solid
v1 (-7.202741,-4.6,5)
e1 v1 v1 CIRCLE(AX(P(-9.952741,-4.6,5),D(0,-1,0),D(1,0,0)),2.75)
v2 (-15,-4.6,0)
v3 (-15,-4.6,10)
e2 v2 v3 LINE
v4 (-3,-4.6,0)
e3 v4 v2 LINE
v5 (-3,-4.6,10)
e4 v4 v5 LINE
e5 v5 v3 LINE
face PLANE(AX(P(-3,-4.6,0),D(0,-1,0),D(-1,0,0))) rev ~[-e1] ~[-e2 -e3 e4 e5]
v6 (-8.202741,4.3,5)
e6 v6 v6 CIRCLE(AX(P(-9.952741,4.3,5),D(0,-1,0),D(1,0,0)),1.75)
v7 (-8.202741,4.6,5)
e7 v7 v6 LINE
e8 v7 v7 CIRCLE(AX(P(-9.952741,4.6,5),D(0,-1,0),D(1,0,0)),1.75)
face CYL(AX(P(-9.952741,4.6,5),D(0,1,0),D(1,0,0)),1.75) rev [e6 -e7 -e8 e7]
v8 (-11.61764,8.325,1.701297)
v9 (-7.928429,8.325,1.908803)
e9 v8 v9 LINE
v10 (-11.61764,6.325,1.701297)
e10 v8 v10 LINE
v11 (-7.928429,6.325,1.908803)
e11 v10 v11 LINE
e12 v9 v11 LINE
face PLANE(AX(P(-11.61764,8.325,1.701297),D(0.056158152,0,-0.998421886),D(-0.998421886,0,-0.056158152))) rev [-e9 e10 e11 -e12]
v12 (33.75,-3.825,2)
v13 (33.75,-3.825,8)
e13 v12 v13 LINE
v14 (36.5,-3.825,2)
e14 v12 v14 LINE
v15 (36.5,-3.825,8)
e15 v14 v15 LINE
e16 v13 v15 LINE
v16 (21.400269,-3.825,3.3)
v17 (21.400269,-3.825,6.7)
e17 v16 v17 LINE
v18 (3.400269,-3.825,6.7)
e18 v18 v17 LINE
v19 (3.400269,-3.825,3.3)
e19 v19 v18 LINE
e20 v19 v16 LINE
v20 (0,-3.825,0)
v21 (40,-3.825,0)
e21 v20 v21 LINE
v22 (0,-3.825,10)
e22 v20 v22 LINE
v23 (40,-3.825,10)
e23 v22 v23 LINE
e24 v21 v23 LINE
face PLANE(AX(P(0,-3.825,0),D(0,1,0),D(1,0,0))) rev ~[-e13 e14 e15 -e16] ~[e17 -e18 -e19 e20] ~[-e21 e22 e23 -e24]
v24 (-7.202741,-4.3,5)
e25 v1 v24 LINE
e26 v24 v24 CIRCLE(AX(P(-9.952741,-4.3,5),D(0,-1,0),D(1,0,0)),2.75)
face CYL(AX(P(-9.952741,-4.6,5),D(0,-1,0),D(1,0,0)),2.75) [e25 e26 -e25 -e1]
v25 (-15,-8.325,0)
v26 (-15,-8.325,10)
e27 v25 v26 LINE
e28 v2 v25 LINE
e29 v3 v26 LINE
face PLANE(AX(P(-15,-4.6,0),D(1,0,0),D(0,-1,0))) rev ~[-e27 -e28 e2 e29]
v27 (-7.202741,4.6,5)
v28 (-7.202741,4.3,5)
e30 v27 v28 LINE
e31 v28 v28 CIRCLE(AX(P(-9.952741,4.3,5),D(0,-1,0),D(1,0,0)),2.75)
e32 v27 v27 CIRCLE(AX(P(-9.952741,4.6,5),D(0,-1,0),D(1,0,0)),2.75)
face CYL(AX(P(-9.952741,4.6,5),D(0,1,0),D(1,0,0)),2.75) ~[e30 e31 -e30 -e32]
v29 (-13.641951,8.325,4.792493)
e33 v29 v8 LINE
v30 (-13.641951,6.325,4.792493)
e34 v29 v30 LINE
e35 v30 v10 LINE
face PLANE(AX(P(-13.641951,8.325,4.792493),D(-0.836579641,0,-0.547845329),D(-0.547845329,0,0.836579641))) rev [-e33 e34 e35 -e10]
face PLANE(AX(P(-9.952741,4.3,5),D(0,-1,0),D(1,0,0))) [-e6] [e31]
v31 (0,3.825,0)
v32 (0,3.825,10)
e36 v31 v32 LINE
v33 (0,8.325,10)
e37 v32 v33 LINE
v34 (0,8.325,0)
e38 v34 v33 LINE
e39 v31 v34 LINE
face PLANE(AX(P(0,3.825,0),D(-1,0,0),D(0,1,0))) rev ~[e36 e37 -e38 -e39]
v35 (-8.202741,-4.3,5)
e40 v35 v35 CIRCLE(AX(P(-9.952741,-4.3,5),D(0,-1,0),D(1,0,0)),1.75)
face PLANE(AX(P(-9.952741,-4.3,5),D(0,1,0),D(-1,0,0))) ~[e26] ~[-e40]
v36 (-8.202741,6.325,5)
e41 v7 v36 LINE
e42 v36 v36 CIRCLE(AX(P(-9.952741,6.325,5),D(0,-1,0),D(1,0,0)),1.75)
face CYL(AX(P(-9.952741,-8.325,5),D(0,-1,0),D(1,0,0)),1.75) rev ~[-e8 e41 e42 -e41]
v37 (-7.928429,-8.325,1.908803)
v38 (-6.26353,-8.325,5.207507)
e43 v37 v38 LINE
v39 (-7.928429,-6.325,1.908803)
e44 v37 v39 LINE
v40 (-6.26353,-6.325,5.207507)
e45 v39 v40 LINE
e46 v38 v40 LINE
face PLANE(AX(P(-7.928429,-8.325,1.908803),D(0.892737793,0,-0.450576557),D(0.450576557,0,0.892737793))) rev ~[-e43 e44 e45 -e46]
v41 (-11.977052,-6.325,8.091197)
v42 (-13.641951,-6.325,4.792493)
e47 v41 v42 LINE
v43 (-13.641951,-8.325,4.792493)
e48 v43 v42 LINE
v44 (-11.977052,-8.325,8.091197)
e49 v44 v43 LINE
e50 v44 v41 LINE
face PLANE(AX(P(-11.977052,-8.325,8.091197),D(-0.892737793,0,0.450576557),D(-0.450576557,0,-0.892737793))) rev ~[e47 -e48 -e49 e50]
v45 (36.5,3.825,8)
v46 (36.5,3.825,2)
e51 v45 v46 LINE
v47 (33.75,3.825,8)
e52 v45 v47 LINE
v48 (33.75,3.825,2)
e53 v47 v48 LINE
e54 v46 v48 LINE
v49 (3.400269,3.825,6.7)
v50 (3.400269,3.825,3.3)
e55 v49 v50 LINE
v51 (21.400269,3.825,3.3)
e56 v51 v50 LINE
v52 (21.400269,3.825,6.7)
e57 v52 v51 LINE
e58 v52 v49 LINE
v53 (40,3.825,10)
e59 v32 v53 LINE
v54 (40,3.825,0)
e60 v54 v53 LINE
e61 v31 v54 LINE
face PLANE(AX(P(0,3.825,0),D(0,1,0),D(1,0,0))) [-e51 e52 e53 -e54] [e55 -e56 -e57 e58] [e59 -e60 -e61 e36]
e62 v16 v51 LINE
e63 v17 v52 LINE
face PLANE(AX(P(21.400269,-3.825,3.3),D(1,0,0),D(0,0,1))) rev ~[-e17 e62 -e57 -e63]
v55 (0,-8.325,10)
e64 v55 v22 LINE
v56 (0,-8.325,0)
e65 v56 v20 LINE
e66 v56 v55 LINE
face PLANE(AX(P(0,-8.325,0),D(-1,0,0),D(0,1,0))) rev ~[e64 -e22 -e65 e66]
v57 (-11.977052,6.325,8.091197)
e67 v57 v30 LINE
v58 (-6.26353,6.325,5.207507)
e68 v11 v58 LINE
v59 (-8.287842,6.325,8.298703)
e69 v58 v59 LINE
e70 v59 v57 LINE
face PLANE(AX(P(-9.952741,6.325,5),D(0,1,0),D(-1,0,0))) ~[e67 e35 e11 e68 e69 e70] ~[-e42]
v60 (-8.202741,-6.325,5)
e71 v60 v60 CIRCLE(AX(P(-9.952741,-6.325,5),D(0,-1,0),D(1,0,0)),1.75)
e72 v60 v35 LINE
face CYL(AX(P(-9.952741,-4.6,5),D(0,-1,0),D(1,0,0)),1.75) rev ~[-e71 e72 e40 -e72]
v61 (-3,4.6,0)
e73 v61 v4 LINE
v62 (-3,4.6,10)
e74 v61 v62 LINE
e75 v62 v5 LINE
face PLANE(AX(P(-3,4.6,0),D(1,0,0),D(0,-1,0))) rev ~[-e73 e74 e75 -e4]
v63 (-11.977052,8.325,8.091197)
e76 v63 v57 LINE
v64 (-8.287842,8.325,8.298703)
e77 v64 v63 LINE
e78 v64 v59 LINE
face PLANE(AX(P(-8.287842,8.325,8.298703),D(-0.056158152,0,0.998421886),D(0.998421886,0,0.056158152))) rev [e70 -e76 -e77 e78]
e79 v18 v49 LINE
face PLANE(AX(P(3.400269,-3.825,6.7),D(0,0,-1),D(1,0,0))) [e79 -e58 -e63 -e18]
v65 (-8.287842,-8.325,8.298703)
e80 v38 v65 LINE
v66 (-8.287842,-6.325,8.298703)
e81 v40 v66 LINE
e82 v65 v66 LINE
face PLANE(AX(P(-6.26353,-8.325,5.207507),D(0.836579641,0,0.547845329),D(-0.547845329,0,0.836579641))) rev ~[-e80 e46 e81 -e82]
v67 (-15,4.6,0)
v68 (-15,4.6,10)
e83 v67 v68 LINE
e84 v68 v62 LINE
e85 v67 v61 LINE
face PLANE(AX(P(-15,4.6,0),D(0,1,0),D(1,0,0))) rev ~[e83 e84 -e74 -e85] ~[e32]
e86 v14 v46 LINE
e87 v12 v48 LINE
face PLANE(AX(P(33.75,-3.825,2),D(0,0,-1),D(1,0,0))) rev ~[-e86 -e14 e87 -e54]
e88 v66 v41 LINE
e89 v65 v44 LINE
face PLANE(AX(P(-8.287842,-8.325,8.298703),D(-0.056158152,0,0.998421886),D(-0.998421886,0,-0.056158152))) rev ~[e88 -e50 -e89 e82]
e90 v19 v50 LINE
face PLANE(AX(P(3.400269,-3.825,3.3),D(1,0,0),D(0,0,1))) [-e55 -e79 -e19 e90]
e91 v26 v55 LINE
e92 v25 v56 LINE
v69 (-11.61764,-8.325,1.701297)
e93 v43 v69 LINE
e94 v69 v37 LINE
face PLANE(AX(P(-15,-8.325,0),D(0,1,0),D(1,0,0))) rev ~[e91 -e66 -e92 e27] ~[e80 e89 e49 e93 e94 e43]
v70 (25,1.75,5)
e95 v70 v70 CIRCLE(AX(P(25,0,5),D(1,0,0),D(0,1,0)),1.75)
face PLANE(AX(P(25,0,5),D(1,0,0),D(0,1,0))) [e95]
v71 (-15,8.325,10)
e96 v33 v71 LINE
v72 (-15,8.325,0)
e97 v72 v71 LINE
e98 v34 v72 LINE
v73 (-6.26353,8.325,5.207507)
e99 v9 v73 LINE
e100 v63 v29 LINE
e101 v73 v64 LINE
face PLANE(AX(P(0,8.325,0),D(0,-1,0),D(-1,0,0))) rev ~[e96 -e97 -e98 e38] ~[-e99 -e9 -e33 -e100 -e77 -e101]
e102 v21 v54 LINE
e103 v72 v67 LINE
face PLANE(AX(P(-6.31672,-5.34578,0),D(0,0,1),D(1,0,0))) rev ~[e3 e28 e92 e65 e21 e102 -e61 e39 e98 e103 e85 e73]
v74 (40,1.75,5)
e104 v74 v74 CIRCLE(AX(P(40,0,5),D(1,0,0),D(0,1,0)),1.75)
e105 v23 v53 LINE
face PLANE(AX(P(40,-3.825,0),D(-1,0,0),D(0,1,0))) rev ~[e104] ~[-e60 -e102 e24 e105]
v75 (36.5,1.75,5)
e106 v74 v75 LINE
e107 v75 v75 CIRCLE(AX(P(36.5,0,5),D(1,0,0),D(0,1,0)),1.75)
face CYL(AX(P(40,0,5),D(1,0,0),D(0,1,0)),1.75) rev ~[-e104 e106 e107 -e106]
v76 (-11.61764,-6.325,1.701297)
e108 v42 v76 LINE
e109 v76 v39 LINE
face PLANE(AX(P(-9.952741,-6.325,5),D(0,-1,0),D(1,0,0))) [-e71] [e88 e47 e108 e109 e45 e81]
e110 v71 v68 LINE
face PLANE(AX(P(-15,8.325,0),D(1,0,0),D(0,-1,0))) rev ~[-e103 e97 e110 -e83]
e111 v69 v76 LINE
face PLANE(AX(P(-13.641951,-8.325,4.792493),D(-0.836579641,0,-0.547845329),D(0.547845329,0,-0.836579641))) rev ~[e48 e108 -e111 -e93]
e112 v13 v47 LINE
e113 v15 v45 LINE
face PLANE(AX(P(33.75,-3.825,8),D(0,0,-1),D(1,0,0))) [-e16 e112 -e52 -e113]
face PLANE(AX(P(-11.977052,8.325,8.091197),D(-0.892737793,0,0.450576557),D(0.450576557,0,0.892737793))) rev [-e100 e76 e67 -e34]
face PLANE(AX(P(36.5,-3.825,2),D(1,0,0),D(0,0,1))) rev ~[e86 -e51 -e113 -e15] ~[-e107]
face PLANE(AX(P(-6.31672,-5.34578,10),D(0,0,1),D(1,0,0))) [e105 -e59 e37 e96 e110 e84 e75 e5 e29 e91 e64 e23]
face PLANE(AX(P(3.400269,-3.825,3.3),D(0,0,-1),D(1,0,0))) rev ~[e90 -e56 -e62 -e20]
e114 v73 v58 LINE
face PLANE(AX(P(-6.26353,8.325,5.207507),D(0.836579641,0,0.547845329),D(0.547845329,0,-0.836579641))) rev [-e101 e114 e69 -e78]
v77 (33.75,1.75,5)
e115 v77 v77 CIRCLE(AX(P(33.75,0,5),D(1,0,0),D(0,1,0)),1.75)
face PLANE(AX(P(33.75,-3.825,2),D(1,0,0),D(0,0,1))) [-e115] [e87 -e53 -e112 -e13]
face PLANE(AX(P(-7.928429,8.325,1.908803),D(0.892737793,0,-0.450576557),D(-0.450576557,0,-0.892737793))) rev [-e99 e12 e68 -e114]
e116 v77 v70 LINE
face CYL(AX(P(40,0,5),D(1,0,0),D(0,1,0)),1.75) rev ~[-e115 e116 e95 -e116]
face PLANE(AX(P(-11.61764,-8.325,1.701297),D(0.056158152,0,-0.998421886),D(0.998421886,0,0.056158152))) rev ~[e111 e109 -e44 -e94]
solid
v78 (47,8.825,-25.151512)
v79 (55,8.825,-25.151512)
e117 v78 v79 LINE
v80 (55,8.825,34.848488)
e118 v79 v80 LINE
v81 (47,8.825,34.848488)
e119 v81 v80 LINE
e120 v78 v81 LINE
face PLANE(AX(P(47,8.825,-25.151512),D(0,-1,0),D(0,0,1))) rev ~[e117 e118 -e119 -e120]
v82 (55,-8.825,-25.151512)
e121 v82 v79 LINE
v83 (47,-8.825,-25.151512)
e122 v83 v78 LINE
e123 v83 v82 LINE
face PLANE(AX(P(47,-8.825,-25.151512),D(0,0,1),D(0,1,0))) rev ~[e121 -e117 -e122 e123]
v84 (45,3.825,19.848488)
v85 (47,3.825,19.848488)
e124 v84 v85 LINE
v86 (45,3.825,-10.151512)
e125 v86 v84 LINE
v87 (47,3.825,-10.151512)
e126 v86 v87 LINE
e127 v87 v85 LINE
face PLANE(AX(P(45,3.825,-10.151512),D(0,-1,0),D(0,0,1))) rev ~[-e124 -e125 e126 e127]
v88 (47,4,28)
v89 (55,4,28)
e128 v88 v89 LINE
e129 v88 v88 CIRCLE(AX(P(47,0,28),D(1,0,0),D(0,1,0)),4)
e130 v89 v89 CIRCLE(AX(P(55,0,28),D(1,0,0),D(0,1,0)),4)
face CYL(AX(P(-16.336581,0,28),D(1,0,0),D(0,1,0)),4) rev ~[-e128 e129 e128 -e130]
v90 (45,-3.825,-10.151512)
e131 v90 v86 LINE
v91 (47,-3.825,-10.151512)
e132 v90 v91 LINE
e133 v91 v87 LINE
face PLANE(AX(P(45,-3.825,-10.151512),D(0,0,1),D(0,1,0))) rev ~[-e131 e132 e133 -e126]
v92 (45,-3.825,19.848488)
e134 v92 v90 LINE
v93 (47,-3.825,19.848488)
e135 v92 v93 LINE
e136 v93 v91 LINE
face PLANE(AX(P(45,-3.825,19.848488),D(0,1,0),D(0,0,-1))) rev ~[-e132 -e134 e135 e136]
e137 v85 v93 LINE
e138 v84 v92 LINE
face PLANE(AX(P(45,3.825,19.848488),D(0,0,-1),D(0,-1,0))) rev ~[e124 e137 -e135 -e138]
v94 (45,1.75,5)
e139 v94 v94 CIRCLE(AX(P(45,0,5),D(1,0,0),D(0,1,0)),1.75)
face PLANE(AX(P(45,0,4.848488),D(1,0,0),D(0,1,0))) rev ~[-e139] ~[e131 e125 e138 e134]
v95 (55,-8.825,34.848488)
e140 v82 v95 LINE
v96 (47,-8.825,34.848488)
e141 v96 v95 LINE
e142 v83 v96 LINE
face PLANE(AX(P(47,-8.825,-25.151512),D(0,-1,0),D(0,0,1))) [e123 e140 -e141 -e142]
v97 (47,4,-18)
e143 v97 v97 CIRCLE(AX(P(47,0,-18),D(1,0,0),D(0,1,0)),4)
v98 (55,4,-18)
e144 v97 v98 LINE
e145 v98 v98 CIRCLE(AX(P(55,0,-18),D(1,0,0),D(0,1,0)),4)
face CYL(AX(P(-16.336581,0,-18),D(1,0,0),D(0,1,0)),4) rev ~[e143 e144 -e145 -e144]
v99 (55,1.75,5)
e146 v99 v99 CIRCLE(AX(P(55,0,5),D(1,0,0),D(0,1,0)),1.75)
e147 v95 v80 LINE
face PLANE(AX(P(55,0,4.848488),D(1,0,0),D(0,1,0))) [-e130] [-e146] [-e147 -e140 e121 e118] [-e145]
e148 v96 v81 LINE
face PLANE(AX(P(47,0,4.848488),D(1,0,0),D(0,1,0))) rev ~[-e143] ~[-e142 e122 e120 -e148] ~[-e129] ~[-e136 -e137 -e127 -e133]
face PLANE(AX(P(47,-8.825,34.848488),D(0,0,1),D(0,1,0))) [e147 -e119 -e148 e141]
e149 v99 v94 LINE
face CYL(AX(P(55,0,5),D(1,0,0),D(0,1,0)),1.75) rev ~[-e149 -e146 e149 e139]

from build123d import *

# Parameters (mm, degrees)
F0_W      = 40
F0_H      = 3.825
F1_DEPTH  = 10
F2_R      = 1.75
F3_DEPTH  = 16.651
F4_W      = 18
F4_H      = 3.4
F4_W_2    = 2.75
F4_H_2    = 6
F5_DEPTH  = 12.151
F6_R      = 1.75
F7_DEPTH  = 15
F10_DEPTH = 2
F11_W     = 17.65
F11_H     = 60
F12_DEPTH = 8
F13_R     = 1.75
F14_DEPTH = 70.001
F15_R     = 2.75
F15_R_2   = 1.75
F16_DEPTH = 0.3
F17_R     = 1.75
F18_DEPTH = 2
F20_D     = 8


# Not quite as in the source:
# - a pattern or mirror of a feature is missing from the dataset's text; its kind, count and spacing are read off the source's solid


with BuildPart() as f1:
    # F0 (on Top) → F1 (new body)
    with BuildSketch(Plane.XY):
        Polygon((0, -3.825), (0, 0), (-3, 0), (-3, -4.6), (-15, -4.6), (-15, -8.325), (0, -8.325), align=None)
        Polygon((-3, 0), (0, 0), (0, 3.825), (0, 8.325), (-15, 8.325), (-15, 4.6), (-3, 4.6), align=None)
        with Locations((20, 1.9125)):
            Rectangle(F0_W, F0_H)
        with Locations((20, -1.9125)):
            Rectangle(F0_W, F0_H)
    extrude(amount=F1_DEPTH)

    # F2 (on face) → F3 (cut, through all)
    with BuildSketch(Plane.XZ.offset(8.325)):
        with Locations((-9.9527407438, 5)):
            Circle(F2_R)
    extrude(amount=-F3_DEPTH, mode=Mode.SUBTRACT)

    # F4 (on face) → F5 (cut, through all)
    with BuildSketch(Plane.XZ.offset(3.825)):
        with Locations((12.4002694301, 5)):
            Rectangle(F4_W, F4_H)
        with Locations((35.125, 5)):
            Rectangle(F4_W_2, F4_H_2)
    extrude(amount=-F5_DEPTH, mode=Mode.SUBTRACT)

    # F6 (on face) → F7 (cut)
    with BuildSketch(Plane.YZ.offset(40)):
        with Locations((0, 5)):
            Circle(F6_R)
    extrude(amount=-F7_DEPTH, mode=Mode.SUBTRACT)

    # F15 (on face) → F16 (join)
    with BuildSketch(Plane.XZ.offset(-4.6)):
        with Locations((-9.9527407438, 5)):
            Circle(F15_R)
        with Locations((-9.9527407438, 5)):
            Circle(F15_R_2, mode=Mode.SUBTRACT)
    f16 = extrude(amount=F16_DEPTH)

    # F16_copies: F16 across plane
    add(f16.mirror(Plane(origin=(0, 0, 0), x_dir=(0, 0, -1), z_dir=(0, -1, 0))))

    # F17 (on face) → F18 (cut)
    with BuildSketch(Plane.XZ.offset(8.325)):
        Polygon((-7.9284293953, 1.9088033227), (-6.2635302189, 5.2075067143), (-8.2878415673, 8.2987033916), (-11.9770520922, 8.0911966773), (-13.6419512686, 4.7924932857), (-11.6176399202, 1.7012966084), align=None)
        with Locations((-9.9527407438, 5)):
            Circle(F17_R, mode=Mode.SUBTRACT)
    f18 = extrude(amount=-F18_DEPTH, mode=Mode.SUBTRACT)

    # F18_copies: F18 across plane
    add(f18.mirror(Plane.ZX), mode=Mode.SUBTRACT)


with BuildPart() as f10:
    # F9 (on offset) → F10 (new body)
    with BuildSketch(Plane.YZ.offset(45)):
        Polygon((3.825, 0), (3.825, 10), (3.825, 19.8484882712), (-3.825, 19.8484882712), (-3.825, 10), (-3.825, 0), (-3.825, -10.1515117288), (3.825, -10.1515117288), align=None)
    extrude(amount=F10_DEPTH)

    # F11 (on face) → F12 (join)
    with BuildSketch(Plane.YZ.offset(47)):
        with Locations((0, 4.8484882712)):
            Rectangle(F11_W, F11_H)
    extrude(amount=F12_DEPTH)

    # F13 (on face) → F14 (cut, through all)
    with BuildSketch(Plane.YZ.offset(55)):
        with Locations((0, 5)):
            Circle(F13_R)
    extrude(amount=-F14_DEPTH, mode=Mode.SUBTRACT)

    # F20 (through all)
    with Locations(Plane(origin=(47, 0, 0), x_dir=(0, -1, 0), z_dir=(-1, 0, 0))):
        with Locations((0, -18), (0, 28)):
            Hole(F20_D / 2)


solid = Compound([f1.part, f10.part])
